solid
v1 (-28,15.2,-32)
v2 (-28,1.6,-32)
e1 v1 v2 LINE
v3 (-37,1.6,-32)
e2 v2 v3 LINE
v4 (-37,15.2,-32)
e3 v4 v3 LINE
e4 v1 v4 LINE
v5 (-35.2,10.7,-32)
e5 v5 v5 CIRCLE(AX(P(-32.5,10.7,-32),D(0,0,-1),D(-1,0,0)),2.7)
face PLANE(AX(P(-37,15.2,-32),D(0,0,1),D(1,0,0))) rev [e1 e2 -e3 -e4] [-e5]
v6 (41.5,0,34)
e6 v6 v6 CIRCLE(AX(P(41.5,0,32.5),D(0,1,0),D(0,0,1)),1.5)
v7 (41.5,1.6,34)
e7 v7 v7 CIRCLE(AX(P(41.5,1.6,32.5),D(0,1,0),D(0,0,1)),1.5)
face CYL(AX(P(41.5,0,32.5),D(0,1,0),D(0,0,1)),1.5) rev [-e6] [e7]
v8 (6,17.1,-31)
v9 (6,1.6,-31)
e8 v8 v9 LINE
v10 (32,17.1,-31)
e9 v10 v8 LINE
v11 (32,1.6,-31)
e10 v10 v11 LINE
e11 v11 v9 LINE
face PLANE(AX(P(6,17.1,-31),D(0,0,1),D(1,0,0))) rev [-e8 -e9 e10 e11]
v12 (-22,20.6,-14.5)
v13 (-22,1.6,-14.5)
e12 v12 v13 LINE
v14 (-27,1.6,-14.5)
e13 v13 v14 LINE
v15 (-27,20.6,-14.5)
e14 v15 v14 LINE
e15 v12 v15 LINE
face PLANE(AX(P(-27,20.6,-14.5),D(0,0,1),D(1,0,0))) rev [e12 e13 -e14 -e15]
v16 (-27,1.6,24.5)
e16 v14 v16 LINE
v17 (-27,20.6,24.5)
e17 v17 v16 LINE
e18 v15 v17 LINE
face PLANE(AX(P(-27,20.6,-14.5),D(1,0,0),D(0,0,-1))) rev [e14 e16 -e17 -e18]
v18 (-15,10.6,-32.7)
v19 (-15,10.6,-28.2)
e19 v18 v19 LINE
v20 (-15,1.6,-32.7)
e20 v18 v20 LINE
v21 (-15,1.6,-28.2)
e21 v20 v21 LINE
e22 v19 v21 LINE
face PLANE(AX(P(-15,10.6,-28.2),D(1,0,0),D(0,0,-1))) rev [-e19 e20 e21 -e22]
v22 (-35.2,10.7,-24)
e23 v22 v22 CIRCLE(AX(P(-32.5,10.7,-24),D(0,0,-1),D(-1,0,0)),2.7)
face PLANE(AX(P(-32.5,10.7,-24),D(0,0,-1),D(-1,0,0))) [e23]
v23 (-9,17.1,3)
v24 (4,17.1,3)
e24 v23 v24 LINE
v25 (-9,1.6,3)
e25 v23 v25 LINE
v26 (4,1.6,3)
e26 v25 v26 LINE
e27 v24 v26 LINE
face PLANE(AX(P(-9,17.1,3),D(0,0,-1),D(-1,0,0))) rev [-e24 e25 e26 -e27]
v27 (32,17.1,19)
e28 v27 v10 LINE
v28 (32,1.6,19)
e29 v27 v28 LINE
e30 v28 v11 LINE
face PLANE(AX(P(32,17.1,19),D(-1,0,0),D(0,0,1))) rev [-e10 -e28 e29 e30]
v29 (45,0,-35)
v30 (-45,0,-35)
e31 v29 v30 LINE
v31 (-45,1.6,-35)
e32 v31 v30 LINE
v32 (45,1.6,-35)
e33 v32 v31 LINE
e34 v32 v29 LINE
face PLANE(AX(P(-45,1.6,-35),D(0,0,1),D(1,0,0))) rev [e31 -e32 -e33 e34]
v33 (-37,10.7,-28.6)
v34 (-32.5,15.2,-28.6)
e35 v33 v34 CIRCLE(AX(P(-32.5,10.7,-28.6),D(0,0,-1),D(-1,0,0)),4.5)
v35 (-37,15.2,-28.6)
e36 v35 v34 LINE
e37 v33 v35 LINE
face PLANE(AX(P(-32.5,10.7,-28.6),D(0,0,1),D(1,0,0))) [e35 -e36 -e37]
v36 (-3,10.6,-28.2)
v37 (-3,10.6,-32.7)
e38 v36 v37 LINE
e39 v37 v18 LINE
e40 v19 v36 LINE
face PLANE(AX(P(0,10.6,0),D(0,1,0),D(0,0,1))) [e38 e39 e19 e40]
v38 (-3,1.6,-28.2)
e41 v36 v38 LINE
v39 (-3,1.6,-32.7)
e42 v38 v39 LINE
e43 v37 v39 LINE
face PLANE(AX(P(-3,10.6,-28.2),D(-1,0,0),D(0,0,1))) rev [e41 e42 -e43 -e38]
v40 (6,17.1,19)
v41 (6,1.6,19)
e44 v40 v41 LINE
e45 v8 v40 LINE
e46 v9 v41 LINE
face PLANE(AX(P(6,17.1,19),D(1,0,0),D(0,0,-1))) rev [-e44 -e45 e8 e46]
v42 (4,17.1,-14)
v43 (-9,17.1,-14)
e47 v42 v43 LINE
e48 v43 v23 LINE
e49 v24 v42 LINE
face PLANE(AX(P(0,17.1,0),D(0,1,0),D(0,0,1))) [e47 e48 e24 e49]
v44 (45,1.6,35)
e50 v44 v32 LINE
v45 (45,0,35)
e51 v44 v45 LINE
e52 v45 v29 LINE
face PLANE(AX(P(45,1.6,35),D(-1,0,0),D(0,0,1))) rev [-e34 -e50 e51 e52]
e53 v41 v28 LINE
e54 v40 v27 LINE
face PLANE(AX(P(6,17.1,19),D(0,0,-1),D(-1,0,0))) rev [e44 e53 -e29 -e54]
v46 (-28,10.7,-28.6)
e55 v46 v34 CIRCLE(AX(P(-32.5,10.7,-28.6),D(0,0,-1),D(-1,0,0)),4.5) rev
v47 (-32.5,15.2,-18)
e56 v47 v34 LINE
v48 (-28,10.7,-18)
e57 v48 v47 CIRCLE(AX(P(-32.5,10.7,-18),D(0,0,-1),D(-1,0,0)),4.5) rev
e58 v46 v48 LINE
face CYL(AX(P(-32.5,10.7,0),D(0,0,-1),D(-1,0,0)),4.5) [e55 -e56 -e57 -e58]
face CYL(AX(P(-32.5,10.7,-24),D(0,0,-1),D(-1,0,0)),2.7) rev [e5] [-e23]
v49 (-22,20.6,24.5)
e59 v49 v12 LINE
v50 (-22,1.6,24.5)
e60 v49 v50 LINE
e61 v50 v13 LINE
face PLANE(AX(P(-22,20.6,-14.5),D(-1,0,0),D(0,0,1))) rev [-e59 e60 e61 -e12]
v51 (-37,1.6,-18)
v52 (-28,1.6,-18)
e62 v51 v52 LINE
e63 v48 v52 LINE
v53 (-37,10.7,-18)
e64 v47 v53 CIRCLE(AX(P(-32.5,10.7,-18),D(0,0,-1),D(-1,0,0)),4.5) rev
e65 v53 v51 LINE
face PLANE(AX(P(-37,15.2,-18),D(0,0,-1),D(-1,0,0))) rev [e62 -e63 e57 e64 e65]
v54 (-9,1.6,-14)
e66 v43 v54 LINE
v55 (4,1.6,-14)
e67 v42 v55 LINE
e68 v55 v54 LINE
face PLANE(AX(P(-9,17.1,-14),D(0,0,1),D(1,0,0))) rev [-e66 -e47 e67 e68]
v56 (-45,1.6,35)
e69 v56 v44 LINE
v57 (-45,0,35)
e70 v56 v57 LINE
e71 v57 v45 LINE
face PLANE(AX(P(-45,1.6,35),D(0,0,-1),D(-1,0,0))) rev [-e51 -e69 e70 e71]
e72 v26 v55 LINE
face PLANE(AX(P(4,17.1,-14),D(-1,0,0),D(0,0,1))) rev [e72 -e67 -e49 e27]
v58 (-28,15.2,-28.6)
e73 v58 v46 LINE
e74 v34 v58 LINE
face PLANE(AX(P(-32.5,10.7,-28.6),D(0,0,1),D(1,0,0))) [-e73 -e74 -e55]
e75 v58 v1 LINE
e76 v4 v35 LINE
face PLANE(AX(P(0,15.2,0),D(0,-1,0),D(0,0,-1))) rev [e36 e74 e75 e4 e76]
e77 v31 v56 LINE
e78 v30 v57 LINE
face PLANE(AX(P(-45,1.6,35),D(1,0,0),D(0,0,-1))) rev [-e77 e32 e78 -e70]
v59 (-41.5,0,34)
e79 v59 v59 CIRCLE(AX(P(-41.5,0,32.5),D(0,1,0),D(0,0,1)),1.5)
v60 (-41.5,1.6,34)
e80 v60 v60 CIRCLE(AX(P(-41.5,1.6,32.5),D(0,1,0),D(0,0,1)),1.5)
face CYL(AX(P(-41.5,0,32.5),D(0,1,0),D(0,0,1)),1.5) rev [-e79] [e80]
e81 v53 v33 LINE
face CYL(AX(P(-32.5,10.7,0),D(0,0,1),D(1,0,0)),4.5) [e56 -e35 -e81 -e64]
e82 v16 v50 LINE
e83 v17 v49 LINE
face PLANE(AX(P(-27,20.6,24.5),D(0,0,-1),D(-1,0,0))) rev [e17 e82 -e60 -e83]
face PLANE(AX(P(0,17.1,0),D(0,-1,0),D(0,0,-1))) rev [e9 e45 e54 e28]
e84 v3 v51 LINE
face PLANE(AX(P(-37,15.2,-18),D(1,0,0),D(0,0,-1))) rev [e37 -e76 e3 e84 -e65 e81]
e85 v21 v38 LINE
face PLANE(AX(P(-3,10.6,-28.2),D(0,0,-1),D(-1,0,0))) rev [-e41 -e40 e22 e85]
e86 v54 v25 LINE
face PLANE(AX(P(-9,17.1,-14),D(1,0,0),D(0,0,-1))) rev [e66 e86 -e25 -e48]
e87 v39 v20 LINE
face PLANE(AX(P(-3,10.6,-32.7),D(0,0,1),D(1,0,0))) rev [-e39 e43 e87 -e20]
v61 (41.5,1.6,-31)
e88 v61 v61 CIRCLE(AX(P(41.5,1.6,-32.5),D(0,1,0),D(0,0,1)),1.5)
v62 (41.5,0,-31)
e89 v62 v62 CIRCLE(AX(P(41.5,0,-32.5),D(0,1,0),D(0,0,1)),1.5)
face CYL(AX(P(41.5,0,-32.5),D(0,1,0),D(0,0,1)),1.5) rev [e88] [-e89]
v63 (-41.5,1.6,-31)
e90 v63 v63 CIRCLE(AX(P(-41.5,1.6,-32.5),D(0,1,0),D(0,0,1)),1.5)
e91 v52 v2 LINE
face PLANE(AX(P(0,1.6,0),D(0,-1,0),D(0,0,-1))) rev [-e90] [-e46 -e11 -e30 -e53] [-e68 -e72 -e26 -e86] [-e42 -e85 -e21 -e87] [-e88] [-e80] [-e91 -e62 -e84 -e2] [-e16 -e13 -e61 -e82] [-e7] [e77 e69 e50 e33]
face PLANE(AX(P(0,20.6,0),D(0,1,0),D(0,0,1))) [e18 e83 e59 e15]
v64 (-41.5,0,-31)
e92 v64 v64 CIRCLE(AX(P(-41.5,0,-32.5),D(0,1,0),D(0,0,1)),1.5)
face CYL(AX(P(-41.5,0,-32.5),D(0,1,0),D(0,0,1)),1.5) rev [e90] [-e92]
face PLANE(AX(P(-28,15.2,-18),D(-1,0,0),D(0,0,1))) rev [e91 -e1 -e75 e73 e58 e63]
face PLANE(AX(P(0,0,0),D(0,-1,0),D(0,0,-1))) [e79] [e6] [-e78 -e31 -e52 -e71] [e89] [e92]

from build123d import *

# Parameters (mm, degrees)
SKETCH1_W           = 90
SKETCH1_H           = 70
BOSS_EXTRUDE1_DEPTH = 1.6
SKETCH2_R           = 1.5
CUT_EXTRUDE1_DEPTH  = 1.6
SKETCH3_W           = 5
SKETCH3_H           = 39
BOSS_EXTRUDE2_DEPTH = 19
SKETCH4_W           = 26
SKETCH4_H           = 50
SKETCH4_W_2         = 13
SKETCH4_H_2         = 17
BOSS_EXTRUDE3_DEPTH = 15.5
SKETCH5_W           = 9
SKETCH5_H           = 14
BOSS_EXTRUDE4_DEPTH = 13.6
SKETCH6_R           = 2.7
CUT_EXTRUDE2_DEPTH  = 8
FILLET1_START       = -28.6
FILLET1_DEPTH       = 10.6
SKETCH7_W           = 12
SKETCH7_H           = 4.5
BOSS_EXTRUDE5_DEPTH = 9


with BuildPart() as part:
    # Sketch1 → Boss-Extrude1 (new body)
    with BuildSketch(Plane(origin=(0, 0, 0), x_dir=(1, 0, 0), z_dir=(0, 1, 0))):
        Rectangle(SKETCH1_W, SKETCH1_H)
    extrude(amount=BOSS_EXTRUDE1_DEPTH)

    # Sketch2 → Cut-Extrude1 (cut)
    with BuildSketch(Plane(origin=(0, 1.6, 0), x_dir=(1, 0, 0), z_dir=(0, 1, 0))):
        with Locations(Location((-41.5, 32.5, 0), (0, 0, 270))):
            Circle(SKETCH2_R)
        with Locations(Location((41.5, 32.5, 0), (0, 0, 270))):
            Circle(SKETCH2_R)
        with Locations(Location((41.5, -32.5, 0), (0, 0, 270))):
            Circle(SKETCH2_R)
        with Locations(Location((-41.5, -32.5, 0), (0, 0, 270))):
            Circle(SKETCH2_R)
    extrude(amount=-CUT_EXTRUDE1_DEPTH, mode=Mode.SUBTRACT)

    # Sketch3 → Boss-Extrude2 (add)
    with BuildSketch(Plane(origin=(0, 1.6, 0), x_dir=(1, 0, 0), z_dir=(0, 1, 0))):
        with Locations((-24.5, -5)):
            Rectangle(SKETCH3_W, SKETCH3_H)
    extrude(amount=BOSS_EXTRUDE2_DEPTH)

    # Sketch4 → Boss-Extrude3 (add)
    with BuildSketch(Plane(origin=(0, 1.6, 0), x_dir=(1, 0, 0), z_dir=(0, 1, 0))):
        with Locations((19, 6)):
            Rectangle(SKETCH4_W, SKETCH4_H)
        with Locations((-2.5, 5.5)):
            Rectangle(SKETCH4_W_2, SKETCH4_H_2)
    extrude(amount=BOSS_EXTRUDE3_DEPTH)

    # Sketch5 → Boss-Extrude4 (add)
    with BuildSketch(Plane(origin=(0, 1.6, 0), x_dir=(1, 0, 0), z_dir=(0, 1, 0))):
        with Locations((-32.5, 25)):
            Rectangle(SKETCH5_W, SKETCH5_H)
    extrude(amount=BOSS_EXTRUDE4_DEPTH)

    # Sketch6 → Cut-Extrude2 (cut)
    with BuildSketch(Plane(origin=(0, 0, -32), x_dir=(-1, 0, 0), z_dir=(0, 0, -1))):
        with Locations((32.5, 10.7)):
            Circle(SKETCH6_R)
    extrude(amount=-CUT_EXTRUDE2_DEPTH, mode=Mode.SUBTRACT)

    # Fillet1: read off the stored shape, not the designer's step
    # Fillet1 outline → Fillet1 (cut)
    with BuildSketch(Plane.XY.offset(FILLET1_START)):
        with BuildLine():
            Line((-28, 15.2), (-32.5, 15.2))
            ThreePointArc((-32.5, 15.2), (-29.318019485, 13.881980515), (-28, 10.7))
            Line((-28, 10.7), (-28, 15.2))
        make_face()
        with BuildLine():
            ThreePointArc((-37, 10.7), (-35.681980515, 13.881980515), (-32.5, 15.2))
            Line((-32.5, 15.2), (-37, 15.2))
            Line((-37, 15.2), (-37, 10.7))
        make_face()
    extrude(amount=FILLET1_DEPTH, mode=Mode.SUBTRACT)

    # Sketch7 → Boss-Extrude5 (add)
    with BuildSketch(Plane(origin=(0, 1.6, 0), x_dir=(1, 0, 0), z_dir=(0, 1, 0))):
        with Locations((-9, 30.45)):
            Rectangle(SKETCH7_W, SKETCH7_H)
    extrude(amount=BOSS_EXTRUDE5_DEPTH)


solid = part.part
